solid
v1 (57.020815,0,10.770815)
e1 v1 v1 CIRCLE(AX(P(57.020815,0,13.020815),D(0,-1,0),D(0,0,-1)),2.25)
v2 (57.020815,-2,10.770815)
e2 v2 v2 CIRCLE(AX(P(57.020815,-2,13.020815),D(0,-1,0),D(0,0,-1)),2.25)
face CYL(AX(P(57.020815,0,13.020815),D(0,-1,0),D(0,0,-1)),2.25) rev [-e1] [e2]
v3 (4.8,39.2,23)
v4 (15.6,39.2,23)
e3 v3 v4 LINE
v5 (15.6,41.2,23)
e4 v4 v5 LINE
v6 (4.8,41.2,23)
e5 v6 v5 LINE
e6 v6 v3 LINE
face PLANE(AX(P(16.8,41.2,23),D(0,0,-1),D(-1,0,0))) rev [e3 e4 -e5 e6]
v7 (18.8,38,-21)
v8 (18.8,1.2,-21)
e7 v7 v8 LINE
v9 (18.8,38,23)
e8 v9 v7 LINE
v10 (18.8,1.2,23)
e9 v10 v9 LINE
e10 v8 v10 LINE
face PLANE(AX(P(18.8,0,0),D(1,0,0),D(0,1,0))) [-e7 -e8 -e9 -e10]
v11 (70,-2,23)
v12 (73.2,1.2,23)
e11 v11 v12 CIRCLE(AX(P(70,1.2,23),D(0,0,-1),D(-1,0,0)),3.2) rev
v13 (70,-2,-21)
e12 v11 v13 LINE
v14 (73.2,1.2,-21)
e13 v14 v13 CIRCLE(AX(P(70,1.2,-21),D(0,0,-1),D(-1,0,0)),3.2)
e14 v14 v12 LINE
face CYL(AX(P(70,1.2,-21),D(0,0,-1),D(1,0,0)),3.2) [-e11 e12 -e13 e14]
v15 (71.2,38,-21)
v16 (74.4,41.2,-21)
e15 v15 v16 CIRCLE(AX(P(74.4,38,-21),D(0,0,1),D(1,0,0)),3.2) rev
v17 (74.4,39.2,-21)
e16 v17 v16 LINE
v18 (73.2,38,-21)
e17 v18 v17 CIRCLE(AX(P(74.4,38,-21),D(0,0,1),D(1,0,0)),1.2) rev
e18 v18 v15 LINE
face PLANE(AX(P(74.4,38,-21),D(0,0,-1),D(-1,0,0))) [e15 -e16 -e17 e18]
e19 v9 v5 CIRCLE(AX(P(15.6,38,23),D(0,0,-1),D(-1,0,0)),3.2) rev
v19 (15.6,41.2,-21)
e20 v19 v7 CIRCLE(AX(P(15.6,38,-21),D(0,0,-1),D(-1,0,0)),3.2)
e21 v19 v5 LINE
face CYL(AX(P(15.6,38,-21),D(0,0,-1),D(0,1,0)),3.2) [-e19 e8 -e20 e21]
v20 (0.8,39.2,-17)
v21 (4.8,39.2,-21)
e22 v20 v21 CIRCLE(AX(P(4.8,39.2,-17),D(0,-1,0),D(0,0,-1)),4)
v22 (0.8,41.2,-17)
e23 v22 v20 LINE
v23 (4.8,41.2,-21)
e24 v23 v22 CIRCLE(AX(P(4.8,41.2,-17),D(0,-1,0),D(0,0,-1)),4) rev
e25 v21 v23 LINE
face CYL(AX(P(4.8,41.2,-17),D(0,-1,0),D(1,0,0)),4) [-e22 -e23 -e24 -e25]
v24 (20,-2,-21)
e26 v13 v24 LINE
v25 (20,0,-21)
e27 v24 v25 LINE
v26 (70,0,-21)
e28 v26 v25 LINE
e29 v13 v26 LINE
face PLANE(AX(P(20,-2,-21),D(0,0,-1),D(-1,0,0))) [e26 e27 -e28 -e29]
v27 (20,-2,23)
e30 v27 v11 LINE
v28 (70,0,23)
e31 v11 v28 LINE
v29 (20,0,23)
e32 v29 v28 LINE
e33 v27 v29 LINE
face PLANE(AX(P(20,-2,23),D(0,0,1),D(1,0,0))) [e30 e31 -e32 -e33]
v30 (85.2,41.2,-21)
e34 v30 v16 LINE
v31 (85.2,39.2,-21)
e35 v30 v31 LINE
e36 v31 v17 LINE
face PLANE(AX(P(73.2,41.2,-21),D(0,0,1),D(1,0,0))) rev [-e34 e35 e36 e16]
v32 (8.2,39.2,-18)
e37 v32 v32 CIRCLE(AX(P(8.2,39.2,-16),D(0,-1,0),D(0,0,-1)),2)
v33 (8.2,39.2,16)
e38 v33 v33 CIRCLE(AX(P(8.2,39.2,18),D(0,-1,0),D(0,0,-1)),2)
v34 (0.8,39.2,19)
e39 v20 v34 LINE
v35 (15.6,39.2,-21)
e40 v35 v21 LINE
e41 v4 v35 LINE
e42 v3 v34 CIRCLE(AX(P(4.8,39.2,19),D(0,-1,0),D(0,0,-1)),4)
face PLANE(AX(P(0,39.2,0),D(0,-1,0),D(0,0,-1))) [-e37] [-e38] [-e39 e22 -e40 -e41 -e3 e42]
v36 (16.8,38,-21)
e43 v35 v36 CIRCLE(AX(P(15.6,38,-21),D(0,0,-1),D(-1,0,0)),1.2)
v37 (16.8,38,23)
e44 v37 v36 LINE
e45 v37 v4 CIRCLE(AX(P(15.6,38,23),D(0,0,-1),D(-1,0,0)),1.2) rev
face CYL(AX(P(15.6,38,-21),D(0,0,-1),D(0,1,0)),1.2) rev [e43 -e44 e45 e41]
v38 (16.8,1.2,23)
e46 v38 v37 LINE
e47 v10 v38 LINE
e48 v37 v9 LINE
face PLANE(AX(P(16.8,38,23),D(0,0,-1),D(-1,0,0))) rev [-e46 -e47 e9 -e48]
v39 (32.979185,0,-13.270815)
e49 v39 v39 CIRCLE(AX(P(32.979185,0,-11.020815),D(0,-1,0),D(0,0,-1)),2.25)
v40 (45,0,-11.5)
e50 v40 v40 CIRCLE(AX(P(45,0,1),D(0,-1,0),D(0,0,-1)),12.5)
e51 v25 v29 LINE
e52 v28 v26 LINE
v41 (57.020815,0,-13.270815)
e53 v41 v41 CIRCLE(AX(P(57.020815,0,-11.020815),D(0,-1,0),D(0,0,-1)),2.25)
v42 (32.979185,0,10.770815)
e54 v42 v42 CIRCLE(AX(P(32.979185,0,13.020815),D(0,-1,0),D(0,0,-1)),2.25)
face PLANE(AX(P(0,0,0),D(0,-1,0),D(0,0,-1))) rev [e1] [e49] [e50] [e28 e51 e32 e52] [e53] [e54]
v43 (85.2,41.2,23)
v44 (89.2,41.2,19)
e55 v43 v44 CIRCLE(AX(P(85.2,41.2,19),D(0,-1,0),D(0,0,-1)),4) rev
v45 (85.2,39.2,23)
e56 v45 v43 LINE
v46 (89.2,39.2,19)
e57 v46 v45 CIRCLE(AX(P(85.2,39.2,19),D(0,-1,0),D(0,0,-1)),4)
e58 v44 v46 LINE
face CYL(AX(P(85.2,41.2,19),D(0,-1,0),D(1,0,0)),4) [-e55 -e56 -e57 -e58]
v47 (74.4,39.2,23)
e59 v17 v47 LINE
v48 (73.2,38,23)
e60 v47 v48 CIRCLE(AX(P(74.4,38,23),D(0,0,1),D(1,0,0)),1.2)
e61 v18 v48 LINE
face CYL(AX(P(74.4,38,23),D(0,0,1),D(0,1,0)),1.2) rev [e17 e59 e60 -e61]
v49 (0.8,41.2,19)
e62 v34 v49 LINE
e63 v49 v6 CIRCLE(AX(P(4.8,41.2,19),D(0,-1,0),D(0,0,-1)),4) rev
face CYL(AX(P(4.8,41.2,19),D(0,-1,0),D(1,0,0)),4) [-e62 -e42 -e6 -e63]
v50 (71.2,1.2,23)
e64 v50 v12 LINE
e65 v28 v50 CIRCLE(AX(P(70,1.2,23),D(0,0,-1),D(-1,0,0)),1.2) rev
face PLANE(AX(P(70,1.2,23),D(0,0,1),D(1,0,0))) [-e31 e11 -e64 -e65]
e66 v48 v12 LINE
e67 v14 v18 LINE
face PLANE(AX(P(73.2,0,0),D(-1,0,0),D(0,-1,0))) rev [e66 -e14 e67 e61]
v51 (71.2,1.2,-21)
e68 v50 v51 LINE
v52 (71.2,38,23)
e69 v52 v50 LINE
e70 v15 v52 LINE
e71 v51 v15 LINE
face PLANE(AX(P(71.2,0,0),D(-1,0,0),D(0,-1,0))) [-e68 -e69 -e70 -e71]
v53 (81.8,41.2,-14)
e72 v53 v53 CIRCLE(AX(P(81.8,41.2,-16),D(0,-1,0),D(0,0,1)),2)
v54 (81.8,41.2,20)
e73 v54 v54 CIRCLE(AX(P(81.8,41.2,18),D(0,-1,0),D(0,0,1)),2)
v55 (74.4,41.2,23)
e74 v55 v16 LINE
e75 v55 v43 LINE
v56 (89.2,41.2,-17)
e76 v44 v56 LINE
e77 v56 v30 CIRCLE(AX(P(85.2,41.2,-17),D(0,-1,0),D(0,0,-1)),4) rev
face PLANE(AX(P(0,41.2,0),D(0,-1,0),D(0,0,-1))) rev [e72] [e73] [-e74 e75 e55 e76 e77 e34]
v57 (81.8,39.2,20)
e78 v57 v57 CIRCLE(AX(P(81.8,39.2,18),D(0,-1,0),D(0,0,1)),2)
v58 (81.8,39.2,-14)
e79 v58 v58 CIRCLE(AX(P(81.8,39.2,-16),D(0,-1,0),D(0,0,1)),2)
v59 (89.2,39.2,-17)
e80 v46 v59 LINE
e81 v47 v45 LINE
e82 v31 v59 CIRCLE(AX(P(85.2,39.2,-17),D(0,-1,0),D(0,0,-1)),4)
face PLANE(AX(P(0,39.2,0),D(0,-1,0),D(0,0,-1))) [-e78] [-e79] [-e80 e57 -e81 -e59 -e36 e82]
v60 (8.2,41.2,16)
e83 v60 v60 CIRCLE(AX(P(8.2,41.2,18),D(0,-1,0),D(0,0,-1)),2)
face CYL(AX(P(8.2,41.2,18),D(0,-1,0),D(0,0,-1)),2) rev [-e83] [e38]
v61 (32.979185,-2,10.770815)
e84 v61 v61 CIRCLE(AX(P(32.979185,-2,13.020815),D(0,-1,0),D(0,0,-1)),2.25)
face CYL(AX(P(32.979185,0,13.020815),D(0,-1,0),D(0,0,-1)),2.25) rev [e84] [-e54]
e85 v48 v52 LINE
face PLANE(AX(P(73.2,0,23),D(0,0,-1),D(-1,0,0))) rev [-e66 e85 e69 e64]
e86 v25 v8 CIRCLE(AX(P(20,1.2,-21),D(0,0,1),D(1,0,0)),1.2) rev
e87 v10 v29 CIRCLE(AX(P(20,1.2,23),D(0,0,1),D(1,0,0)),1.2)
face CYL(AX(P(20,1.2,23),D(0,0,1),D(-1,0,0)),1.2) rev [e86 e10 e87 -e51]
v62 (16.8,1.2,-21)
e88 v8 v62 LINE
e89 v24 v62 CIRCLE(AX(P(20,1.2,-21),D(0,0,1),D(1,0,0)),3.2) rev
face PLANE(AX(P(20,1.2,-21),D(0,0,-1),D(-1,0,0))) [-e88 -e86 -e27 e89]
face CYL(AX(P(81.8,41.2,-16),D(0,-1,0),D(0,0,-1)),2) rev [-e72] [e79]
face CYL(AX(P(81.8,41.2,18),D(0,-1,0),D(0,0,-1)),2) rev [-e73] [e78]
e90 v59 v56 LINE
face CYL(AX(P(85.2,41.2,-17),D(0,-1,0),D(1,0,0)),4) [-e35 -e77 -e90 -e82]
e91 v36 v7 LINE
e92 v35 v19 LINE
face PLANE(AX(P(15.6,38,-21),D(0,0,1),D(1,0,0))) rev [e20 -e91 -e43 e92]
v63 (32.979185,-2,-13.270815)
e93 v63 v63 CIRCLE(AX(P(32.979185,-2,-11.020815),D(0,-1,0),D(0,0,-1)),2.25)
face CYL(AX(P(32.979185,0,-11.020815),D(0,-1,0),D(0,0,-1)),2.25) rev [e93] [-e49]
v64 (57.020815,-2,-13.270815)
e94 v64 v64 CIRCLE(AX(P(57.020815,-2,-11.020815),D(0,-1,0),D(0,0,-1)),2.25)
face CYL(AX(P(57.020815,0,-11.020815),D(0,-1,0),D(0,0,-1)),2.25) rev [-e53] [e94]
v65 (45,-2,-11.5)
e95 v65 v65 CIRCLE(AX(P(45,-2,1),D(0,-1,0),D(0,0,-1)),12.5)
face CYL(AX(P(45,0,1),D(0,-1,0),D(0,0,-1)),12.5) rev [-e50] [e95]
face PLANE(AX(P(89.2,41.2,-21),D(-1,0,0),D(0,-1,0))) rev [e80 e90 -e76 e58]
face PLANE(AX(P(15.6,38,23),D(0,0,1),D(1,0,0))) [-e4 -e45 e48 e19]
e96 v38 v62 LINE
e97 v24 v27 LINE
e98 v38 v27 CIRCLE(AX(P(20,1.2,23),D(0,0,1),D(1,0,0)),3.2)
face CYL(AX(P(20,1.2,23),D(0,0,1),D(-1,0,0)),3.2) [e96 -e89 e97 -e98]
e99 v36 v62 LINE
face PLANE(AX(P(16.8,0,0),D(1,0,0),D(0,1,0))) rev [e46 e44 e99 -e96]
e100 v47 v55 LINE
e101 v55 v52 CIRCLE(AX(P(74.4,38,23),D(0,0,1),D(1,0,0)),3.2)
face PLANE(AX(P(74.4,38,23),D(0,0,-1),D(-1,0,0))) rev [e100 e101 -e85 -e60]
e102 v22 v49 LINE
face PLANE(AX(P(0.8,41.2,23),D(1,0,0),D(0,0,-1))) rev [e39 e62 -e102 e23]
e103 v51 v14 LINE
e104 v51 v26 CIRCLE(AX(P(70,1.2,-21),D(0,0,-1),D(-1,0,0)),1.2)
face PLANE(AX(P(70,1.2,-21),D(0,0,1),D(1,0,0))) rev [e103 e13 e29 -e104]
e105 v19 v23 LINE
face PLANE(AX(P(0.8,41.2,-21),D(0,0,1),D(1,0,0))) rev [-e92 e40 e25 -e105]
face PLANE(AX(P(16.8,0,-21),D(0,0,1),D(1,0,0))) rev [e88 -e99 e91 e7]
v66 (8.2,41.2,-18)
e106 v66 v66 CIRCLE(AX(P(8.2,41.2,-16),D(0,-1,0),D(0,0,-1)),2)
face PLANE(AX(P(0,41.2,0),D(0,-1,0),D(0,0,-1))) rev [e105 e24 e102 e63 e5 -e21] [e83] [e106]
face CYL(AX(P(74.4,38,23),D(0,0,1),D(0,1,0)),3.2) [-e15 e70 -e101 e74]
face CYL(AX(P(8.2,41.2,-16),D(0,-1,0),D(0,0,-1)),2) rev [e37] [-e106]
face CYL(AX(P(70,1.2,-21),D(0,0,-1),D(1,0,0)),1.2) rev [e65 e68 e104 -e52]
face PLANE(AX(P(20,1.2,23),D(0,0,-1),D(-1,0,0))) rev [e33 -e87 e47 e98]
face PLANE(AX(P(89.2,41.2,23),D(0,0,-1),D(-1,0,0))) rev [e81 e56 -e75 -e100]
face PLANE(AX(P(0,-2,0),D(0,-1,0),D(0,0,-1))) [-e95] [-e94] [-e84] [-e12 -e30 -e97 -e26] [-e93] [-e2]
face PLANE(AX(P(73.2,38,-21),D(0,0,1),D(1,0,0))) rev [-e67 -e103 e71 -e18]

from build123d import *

# Parameters (mm, degrees)
SKETCH1_W               = 50
SKETCH1_H               = 44
BASE_FLANGE1_DEPTH      = 2
EDGE_FLANGE1_DEPTH      = 44
EDGE_FLANGE1_BEND_DEPTH = 44
EDGE_FLANGE2_DEPTH      = 44
EDGE_FLANGE2_BEND_DEPTH = 44
SKETCH21_R              = 12.5
SKETCH21_R_2            = 2.25
CUT_EXTRUDE1_DEPTH      = 2
SKETCH22_R              = 2
CUT_EXTRUDE2_DEPTH      = 2
FILLET1_R               = 4


# Sheet-metal steps are written as plain solids
with BuildPart() as part:
    # Sketch1 → Base-Flange1 (new body)
    with BuildSketch(Plane(origin=(0, 0, 0), x_dir=(1, 0, 0), z_dir=(0, 1, 0))):
        with Locations((45, -1)):
            Rectangle(SKETCH1_W, SKETCH1_H)
    extrude(amount=-BASE_FLANGE1_DEPTH)

    # Edge-Flange1 section (across the edge) → Edge-Flange1 (add)
    with BuildSketch(Plane(origin=(18.8, 0, -21), x_dir=(1, 0, 0), z_dir=(0, 0, 1))):
        with BuildLine():
            Line((-2, 1.2), (-2, 38))
            Line((-2, 38), (0, 38))
            Line((0, 38), (0, 1.2))
            ThreePointArc((0, 1.2), (0.351471863, 0.351471863), (1.2, 0))
            Line((1.2, 0), (1.2, -2))
            ThreePointArc((1.2, -2), (-1.0627417, -1.0627417), (-2, 1.2))
        make_face()
    extrude(amount=EDGE_FLANGE1_DEPTH)

    # Edge-Flange1 section 2 (across the edge) → Edge-Flange1 bend (add)
    with BuildSketch(Plane(origin=(71.2, 0, 23), x_dir=(-1, 0, 0), z_dir=(0, 0, -1))):
        with BuildLine():
            Line((-2, 1.2), (-2, 38))
            Line((-2, 38), (0, 38))
            Line((0, 38), (0, 1.2))
            ThreePointArc((0, 1.2), (0.351471863, 0.351471863), (1.2, 0))
            Line((1.2, 0), (1.2, -2))
            ThreePointArc((1.2, -2), (-1.0627417, -1.0627417), (-2, 1.2))
        make_face()
    extrude(amount=EDGE_FLANGE1_BEND_DEPTH)

    # Edge-Flange2 section (across the edge) → Edge-Flange2 (add)
    with BuildSketch(Plane(origin=(73.2, 39.2, -21), x_dir=(0, -1, 0), z_dir=(0, 0, 1))):
        with BuildLine():
            Line((-2, 1.2), (-2, 16))
            Line((-2, 16), (0, 16))
            Line((0, 16), (0, 1.2))
            ThreePointArc((0, 1.2), (0.351471863, 0.351471863), (1.2, 0))
            Line((1.2, 0), (1.2, -2))
            ThreePointArc((1.2, -2), (-1.0627417, -1.0627417), (-2, 1.2))
        make_face()
    extrude(amount=EDGE_FLANGE2_DEPTH)

    # Edge-Flange2 section 2 (across the edge) → Edge-Flange2 bend (add)
    with BuildSketch(Plane(origin=(16.8, 39.2, 23), x_dir=(0, -1, 0), z_dir=(0, 0, -1))):
        with BuildLine():
            Line((-2, 1.2), (-2, 16))
            Line((-2, 16), (0, 16))
            Line((0, 16), (0, 1.2))
            ThreePointArc((0, 1.2), (0.351471863, 0.351471863), (1.2, 0))
            Line((1.2, 0), (1.2, -2))
            ThreePointArc((1.2, -2), (-1.0627417, -1.0627417), (-2, 1.2))
        make_face()
    extrude(amount=EDGE_FLANGE2_BEND_DEPTH)

    # Sketch21 → Cut-Extrude1 (cut)
    with BuildSketch(Plane.XZ.offset(2)):
        with Locations(Location((45, 1, 0), (0, 0, 270))):
            Circle(SKETCH21_R)
        with Locations(Location((57.02081528, 13.02081528, 0), (0, 0, 270))):
            Circle(SKETCH21_R_2)
        with Locations(Location((57.02081528, -11.02081528, 0), (0, 0, 270))):
            Circle(SKETCH21_R_2)
        with Locations(Location((32.97918472, -11.02081528, 0), (0, 0, 270))):
            Circle(SKETCH21_R_2)
        with Locations(Location((32.97918472, 13.02081528, 0), (0, 0, 270))):
            Circle(SKETCH21_R_2)
    extrude(amount=-CUT_EXTRUDE1_DEPTH, mode=Mode.SUBTRACT)

    # Sketch22 → Cut-Extrude2 (cut)
    with BuildSketch(Plane.XZ.offset(-39.2)):
        with Locations(Location((8.2, 18, 0), (0, 0, 270))):
            Circle(SKETCH22_R)
        with Locations(Location((8.2, -16, 0), (0, 0, 270))):
            Circle(SKETCH22_R)
        with Locations(Location((81.8, -16, 0), (0, 0, 90))):
            Circle(SKETCH22_R)
        with Locations(Location((81.8, 18, 0), (0, 0, 90))):
            Circle(SKETCH22_R)
    extrude(amount=-CUT_EXTRUDE2_DEPTH, mode=Mode.SUBTRACT)

    # Fillet1
    fillet1_edges = [part.edges().sort_by_distance(p)[0] for p in [
        (89.2, 40.2, -21),
        (89.2, 40.2, 23),
        (0.8, 40.2, 23),
        (0.8, 40.2, -21),
    ]]
    fillet(fillet1_edges, radius=FILLET1_R)


solid = part.part
